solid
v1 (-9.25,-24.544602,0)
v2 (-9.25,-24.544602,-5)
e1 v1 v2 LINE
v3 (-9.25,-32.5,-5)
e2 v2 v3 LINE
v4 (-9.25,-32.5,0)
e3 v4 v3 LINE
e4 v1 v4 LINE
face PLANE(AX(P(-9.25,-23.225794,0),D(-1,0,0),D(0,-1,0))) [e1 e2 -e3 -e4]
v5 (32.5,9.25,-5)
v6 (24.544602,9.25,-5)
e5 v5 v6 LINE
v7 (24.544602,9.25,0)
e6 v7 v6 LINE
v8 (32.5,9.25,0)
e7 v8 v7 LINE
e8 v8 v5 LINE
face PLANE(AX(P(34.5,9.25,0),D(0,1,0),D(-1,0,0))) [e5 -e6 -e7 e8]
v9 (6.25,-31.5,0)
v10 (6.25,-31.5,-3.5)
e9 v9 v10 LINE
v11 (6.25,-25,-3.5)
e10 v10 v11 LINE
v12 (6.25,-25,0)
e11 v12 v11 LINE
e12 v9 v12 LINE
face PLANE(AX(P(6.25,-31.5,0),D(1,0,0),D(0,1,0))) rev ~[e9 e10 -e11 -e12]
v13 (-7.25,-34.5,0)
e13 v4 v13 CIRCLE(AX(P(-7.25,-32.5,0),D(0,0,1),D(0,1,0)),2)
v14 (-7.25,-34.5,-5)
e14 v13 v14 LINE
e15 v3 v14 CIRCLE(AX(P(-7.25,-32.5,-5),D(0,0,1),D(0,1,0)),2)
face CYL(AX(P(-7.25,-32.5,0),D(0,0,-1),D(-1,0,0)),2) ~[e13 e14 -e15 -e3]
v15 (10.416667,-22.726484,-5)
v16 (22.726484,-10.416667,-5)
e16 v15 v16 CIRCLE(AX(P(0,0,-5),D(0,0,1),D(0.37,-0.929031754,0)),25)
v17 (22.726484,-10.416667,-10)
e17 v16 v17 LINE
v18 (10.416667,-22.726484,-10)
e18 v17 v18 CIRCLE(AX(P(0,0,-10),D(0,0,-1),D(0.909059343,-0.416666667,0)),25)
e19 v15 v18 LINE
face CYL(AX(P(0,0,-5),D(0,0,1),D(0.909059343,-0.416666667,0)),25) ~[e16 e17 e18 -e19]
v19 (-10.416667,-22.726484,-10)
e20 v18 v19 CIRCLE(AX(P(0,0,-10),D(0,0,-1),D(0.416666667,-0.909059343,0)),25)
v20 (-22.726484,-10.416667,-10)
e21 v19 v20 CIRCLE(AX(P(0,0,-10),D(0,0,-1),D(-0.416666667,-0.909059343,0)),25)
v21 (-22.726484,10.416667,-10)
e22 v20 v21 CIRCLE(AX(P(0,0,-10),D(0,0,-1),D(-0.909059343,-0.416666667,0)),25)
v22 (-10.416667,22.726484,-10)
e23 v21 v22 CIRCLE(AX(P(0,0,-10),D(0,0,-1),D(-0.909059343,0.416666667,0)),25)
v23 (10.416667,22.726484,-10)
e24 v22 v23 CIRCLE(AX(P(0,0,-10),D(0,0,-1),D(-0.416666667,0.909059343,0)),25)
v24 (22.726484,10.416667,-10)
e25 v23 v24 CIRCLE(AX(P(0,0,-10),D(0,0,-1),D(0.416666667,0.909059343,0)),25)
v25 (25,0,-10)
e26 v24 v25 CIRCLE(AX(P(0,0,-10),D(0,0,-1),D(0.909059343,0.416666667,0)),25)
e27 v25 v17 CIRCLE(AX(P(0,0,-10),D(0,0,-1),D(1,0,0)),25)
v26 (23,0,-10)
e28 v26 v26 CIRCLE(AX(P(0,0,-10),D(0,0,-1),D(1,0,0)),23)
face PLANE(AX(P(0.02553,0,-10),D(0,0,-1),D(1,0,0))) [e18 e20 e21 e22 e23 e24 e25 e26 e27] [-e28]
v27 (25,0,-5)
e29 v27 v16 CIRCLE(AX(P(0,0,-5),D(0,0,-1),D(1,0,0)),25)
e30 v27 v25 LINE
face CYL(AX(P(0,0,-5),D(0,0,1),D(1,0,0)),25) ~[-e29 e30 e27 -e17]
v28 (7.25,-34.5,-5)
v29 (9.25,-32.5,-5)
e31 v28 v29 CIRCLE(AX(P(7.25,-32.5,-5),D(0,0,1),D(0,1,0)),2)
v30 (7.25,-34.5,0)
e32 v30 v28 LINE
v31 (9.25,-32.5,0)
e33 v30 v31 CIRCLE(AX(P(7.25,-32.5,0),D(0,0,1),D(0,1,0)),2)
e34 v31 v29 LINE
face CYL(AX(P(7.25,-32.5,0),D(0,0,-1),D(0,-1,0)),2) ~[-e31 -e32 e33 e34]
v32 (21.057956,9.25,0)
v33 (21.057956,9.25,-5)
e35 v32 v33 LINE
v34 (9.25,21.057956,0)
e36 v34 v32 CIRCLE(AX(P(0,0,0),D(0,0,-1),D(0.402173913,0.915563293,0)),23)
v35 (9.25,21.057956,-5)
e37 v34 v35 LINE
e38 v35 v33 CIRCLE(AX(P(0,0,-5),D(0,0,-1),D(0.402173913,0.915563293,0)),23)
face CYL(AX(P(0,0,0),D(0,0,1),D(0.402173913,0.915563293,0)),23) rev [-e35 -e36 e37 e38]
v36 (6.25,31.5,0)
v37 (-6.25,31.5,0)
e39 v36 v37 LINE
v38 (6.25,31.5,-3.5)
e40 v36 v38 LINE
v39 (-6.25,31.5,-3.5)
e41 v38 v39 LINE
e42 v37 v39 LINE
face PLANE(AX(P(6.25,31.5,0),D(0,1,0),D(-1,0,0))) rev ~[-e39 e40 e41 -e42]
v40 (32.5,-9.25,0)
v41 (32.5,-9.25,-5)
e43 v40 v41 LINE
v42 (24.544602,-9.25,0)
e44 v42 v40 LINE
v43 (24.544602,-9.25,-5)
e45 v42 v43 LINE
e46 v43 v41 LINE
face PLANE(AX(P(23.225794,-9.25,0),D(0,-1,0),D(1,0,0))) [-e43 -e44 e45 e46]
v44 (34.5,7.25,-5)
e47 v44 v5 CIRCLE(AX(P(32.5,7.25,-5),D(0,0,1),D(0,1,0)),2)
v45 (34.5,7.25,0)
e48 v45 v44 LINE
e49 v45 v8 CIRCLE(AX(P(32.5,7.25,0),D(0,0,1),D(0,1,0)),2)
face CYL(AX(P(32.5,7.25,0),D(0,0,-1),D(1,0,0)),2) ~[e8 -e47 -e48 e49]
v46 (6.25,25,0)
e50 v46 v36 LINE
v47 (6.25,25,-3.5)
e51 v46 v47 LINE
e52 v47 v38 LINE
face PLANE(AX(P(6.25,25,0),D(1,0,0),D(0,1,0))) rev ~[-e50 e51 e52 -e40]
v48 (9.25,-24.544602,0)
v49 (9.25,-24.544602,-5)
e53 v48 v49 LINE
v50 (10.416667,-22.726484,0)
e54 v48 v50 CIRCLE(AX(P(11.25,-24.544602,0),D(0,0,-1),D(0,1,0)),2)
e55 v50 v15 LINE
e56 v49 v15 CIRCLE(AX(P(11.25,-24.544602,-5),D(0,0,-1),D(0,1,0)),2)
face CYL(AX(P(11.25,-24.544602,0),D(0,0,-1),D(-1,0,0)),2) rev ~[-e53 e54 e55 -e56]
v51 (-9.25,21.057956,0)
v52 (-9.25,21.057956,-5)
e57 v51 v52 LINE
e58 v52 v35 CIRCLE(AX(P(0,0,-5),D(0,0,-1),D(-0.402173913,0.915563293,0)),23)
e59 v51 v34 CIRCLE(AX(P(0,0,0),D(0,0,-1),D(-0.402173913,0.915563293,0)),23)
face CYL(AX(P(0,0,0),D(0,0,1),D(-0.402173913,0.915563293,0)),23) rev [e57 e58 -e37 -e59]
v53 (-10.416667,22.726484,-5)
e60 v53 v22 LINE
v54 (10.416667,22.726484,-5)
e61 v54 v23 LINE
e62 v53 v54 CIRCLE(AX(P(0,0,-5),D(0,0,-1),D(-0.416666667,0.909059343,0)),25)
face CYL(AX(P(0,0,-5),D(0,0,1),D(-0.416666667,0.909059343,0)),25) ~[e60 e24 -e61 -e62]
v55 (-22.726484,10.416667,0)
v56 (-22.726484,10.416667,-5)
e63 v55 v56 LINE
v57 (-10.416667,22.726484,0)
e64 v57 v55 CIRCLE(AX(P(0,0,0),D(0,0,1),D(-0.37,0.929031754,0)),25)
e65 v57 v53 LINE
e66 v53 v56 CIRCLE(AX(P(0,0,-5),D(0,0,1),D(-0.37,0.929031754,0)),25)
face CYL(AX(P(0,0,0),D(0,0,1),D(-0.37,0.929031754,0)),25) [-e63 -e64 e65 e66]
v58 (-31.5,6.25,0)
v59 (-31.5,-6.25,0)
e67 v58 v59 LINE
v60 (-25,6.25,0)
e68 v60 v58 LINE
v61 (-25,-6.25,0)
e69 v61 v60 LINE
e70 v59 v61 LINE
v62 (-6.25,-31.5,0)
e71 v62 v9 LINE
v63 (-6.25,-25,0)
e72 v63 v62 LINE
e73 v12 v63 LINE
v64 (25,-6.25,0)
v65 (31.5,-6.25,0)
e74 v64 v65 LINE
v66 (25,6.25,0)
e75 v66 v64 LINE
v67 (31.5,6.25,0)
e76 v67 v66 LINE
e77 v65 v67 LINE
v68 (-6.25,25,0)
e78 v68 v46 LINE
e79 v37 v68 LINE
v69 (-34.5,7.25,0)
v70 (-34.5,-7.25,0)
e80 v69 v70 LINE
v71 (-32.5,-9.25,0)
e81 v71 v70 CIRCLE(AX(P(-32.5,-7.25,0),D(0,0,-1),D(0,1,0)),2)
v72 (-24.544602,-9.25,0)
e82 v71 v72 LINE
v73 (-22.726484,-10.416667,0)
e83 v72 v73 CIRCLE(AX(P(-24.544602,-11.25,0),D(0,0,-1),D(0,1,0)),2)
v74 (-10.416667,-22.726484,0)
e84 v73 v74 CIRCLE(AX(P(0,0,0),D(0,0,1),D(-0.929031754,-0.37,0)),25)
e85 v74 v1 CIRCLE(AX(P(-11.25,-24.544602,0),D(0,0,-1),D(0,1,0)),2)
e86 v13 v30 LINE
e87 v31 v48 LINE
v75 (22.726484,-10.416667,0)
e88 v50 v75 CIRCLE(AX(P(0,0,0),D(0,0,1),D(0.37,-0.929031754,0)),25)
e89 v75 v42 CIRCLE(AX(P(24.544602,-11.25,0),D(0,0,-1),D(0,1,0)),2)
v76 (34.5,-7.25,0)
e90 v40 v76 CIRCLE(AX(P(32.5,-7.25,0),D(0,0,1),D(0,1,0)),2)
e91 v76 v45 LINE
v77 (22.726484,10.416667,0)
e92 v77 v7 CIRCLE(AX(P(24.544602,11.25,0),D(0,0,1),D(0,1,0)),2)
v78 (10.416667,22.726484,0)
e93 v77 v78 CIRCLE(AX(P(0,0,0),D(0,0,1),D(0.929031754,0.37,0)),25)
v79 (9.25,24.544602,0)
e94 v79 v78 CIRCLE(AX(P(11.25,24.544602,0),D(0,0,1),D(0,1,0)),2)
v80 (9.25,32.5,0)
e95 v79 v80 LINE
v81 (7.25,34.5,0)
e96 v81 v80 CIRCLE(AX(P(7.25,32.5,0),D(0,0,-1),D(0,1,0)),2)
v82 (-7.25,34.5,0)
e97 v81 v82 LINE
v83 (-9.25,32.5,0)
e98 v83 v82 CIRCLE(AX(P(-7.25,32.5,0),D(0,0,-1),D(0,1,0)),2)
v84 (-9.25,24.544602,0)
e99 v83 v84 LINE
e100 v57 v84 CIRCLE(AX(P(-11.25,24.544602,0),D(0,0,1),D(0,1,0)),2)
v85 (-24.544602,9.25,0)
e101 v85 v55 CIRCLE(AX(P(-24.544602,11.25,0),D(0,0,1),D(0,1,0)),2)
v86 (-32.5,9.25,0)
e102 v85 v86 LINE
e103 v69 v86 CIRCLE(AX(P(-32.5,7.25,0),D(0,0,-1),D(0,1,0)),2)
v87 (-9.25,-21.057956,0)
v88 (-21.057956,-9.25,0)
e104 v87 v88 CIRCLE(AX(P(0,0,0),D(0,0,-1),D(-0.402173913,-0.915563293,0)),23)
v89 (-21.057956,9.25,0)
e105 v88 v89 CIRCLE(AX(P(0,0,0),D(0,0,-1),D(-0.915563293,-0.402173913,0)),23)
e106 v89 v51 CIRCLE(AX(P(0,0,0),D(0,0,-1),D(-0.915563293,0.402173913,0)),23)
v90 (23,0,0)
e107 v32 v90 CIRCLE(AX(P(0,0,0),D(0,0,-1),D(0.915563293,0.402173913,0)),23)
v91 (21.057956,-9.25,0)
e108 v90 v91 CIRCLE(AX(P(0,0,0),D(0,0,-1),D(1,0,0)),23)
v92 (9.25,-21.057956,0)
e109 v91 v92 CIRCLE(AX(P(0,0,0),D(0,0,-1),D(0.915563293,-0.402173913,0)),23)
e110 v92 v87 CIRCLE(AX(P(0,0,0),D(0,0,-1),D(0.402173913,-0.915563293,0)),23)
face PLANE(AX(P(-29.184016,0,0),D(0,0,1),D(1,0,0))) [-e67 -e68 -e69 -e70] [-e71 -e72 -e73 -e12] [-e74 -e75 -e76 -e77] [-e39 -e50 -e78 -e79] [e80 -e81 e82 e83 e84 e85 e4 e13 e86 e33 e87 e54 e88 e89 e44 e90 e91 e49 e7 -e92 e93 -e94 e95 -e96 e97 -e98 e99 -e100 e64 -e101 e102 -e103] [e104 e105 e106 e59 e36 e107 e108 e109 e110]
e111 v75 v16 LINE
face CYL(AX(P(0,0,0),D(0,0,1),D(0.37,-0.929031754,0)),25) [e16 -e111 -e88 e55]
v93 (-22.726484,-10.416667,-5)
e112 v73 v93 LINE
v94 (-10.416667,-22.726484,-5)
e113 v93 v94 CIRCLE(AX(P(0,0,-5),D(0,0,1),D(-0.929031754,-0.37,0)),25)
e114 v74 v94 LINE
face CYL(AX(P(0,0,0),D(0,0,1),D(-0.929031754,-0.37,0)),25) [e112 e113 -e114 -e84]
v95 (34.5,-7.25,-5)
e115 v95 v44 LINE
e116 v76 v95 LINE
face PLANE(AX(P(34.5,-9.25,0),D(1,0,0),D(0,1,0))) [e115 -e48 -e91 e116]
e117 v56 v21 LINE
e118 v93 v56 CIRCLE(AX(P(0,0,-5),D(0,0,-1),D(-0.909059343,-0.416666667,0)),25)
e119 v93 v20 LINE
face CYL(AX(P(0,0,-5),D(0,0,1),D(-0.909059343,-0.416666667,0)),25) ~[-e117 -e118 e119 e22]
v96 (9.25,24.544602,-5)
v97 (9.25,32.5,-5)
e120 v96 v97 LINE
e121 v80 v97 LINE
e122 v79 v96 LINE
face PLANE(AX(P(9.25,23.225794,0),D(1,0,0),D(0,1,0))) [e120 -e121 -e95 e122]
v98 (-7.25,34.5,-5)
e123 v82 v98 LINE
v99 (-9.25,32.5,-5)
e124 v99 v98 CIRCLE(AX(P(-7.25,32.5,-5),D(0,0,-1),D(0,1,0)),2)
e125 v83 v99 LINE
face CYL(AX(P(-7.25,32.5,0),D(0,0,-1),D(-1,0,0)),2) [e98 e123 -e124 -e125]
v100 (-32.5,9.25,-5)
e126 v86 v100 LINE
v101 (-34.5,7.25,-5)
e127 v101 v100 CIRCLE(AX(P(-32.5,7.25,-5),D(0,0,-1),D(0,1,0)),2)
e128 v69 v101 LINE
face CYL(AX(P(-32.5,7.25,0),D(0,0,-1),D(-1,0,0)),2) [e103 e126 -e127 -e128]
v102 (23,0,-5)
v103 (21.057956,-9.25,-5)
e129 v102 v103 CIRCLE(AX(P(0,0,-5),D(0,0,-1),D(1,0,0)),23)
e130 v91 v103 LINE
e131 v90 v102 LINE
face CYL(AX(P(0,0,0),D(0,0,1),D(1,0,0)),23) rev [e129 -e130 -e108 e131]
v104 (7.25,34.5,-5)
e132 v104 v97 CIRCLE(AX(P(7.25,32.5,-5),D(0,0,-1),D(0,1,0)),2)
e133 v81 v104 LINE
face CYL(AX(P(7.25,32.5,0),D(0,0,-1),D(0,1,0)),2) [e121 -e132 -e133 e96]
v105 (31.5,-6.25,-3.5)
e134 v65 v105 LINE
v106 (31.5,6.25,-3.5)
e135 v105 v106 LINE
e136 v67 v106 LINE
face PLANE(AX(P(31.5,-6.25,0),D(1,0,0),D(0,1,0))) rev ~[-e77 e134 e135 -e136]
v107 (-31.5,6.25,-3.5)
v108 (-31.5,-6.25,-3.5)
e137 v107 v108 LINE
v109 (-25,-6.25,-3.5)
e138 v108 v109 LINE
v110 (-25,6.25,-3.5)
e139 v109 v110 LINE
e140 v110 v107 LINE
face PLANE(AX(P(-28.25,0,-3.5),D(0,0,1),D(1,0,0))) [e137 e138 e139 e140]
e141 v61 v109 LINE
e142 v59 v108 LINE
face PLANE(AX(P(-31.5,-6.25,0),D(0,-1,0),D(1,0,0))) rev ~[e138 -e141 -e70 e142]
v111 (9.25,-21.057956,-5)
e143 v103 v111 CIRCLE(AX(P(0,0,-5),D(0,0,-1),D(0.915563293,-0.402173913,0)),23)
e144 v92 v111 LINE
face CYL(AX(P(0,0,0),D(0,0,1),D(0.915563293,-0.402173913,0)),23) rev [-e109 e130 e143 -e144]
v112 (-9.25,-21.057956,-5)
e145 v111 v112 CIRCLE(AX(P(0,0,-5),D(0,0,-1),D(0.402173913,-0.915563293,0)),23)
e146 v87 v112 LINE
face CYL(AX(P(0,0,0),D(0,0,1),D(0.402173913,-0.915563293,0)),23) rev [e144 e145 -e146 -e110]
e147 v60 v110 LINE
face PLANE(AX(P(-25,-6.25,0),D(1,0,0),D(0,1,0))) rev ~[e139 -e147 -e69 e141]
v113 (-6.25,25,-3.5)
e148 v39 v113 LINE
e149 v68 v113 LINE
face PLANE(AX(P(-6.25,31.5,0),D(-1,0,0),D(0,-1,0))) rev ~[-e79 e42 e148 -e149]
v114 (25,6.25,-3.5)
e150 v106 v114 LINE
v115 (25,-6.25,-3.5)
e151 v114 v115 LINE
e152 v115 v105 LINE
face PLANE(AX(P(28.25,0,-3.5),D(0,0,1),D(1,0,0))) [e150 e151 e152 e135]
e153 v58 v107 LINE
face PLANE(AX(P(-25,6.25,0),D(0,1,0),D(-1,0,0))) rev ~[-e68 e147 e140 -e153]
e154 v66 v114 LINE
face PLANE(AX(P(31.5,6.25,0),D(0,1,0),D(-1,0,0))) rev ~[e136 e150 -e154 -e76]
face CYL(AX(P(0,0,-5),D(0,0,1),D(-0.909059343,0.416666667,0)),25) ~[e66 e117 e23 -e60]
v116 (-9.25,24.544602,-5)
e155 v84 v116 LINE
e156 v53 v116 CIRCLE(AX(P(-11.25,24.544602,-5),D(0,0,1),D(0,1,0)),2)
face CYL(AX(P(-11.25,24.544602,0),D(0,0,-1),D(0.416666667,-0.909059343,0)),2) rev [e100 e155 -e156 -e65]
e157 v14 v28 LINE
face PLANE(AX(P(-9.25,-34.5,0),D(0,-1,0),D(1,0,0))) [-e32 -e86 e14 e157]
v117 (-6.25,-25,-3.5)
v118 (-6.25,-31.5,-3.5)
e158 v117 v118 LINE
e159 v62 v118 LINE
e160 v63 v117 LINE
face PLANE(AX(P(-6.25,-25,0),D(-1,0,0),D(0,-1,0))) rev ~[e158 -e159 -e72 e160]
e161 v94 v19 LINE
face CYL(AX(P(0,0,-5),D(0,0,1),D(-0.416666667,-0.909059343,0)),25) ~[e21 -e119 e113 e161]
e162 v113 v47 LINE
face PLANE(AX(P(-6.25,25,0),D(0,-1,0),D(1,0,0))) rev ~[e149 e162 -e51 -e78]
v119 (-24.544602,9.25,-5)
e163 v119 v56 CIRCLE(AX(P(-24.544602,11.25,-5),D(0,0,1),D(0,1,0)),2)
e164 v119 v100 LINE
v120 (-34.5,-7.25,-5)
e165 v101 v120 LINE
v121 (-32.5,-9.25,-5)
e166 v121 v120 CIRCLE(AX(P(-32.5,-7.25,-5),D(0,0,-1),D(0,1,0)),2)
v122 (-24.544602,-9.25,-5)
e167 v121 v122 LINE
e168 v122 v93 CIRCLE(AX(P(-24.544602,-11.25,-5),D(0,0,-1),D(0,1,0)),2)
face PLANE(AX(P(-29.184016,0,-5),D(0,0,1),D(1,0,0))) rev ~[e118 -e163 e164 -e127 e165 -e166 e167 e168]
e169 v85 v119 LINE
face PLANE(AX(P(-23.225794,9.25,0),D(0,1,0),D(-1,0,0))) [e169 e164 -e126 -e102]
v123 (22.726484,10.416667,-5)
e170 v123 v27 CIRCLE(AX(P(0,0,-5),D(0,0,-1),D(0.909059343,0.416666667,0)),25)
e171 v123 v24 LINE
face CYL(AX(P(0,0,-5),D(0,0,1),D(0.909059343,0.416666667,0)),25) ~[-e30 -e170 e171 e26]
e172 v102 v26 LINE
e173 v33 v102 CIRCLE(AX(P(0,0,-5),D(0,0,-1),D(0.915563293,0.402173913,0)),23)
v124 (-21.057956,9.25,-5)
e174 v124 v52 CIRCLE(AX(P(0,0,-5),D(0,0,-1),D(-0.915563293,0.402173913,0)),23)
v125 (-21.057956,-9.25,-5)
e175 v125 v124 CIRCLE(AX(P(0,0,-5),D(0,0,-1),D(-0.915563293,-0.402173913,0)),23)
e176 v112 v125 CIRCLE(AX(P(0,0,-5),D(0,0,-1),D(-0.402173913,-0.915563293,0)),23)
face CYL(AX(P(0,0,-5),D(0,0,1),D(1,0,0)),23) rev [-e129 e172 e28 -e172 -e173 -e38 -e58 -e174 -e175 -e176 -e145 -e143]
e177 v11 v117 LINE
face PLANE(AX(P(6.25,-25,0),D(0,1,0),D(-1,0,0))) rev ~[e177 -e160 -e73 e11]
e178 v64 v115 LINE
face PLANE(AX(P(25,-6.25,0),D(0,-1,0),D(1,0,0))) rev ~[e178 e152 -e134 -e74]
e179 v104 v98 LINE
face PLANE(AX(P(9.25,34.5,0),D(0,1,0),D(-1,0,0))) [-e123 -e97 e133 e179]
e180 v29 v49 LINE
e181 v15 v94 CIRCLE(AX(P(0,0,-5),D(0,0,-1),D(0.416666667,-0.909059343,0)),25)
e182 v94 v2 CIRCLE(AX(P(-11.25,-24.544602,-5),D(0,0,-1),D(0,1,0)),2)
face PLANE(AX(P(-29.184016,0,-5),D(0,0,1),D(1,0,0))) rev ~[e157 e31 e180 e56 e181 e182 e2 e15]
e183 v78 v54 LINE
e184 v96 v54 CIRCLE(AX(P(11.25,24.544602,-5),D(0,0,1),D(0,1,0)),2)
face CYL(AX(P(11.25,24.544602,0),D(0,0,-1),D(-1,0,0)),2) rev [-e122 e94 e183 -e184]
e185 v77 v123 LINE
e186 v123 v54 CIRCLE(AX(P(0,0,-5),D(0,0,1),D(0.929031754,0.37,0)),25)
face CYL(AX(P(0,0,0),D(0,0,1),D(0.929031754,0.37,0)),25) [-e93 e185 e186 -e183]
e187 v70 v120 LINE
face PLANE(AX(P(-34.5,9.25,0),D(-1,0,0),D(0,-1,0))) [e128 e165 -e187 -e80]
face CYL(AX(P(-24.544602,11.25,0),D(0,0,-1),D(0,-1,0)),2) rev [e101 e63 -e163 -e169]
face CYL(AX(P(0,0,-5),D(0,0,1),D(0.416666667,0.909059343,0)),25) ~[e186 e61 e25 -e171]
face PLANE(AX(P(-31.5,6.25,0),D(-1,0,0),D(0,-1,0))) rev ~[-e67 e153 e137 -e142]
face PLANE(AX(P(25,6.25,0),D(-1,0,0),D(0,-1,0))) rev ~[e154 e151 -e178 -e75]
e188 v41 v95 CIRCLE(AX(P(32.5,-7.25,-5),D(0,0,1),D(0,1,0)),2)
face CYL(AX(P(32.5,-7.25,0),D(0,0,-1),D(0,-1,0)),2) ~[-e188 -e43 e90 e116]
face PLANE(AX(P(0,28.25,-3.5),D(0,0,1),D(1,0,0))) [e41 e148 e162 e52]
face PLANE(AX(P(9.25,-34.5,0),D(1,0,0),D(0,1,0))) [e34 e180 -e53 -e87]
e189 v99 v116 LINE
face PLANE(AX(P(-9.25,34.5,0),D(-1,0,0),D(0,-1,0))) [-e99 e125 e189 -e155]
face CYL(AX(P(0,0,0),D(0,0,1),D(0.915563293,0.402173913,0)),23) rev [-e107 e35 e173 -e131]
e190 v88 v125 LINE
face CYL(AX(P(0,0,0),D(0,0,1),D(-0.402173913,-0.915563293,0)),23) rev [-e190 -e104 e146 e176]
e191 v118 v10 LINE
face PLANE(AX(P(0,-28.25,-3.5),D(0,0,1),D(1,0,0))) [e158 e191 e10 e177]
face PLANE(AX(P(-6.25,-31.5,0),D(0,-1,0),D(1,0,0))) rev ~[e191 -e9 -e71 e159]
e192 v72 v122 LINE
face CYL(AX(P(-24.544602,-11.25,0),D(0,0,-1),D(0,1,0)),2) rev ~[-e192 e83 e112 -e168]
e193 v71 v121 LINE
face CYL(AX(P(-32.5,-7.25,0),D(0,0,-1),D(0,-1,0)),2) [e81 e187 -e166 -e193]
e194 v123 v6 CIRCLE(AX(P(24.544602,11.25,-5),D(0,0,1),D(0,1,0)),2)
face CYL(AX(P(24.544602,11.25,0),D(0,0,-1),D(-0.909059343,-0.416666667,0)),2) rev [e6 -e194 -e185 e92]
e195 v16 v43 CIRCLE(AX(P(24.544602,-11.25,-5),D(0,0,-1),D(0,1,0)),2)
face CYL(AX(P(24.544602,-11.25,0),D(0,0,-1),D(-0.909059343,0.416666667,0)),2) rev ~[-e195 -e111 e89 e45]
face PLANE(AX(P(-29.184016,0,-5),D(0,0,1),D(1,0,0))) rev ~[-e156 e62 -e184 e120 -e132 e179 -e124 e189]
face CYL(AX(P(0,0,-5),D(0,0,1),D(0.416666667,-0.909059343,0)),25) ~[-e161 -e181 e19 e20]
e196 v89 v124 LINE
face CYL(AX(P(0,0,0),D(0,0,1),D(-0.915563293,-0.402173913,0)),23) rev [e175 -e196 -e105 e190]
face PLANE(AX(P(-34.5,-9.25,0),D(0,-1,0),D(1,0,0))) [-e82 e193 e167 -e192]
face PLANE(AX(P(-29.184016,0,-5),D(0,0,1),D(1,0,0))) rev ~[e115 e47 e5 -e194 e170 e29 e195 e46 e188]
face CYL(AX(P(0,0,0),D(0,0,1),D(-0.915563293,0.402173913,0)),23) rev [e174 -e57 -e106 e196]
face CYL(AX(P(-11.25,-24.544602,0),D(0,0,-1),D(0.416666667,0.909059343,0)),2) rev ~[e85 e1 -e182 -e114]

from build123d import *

# Parameters (mm, degrees)
F1_DEPTH = 5
F2_DEPTH = 3.5
F3_R     = 2
F4_R     = 23
F5_DEPTH = 5


# Not quite as in the source:
# - a feature names something its author has since deleted; it is built from what else it names


with BuildPart() as f1:
    # F0 (on Top) → F1 (new body)
    with BuildSketch(Plane.XY):
        with BuildLine():
            ThreePointArc((-25, 0), (-24.5524423049, 4.7093074719), (-23.2257938508, 9.25))
            Line((-23.2257938508, 9.25), (-34.5, 9.25))
            Line((-34.5, 9.25), (-34.5, -9.25))
            Line((-34.5, -9.25), (-23.2257938508, -9.25))
            ThreePointArc((-23.2257938508, -9.25), (-24.5524423049, -4.7093074719), (-25, 0))
        make_face()
        Polygon((-25, 6.25), (-25, 0), (-25, -6.25), (-31.5, -6.25), (-31.5, 6.25), align=None, mode=Mode.SUBTRACT)
        with BuildLine():
            Line((34.5, 9.25), (23.2257938508, 9.25))
            ThreePointArc((23.2257938508, 9.25), (24.5524423049, 4.7093074719), (25, 0))
            ThreePointArc((25, 0), (24.5524423049, -4.7093074719), (23.2257938508, -9.25))
            Line((23.2257938508, -9.25), (34.5, -9.25))
            Line((34.5, -9.25), (34.5, 9.25))
        make_face()
        Polygon((25, -6.25), (25, 0), (25, 6.25), (31.5, 6.25), (31.5, -6.25), align=None, mode=Mode.SUBTRACT)
        Polygon((-25, -6.25), (-25, 0), (-25, 6.25), (-31.5, 6.25), (-31.5, -6.25), align=None)
        Polygon((25, 6.25), (25, 0), (25, -6.25), (31.5, -6.25), (31.5, 6.25), align=None)
        with BuildLine():
            ThreePointArc((21.0579557412, 9.25), (22.5092534533, 4.7258342095), (23, 0))
            ThreePointArc((23, 0), (22.5092534533, -4.7258342095), (21.0579557412, -9.25))
            Line((21.0579557412, -9.25), (23.2257938508, -9.25))
            ThreePointArc((23.2257938508, -9.25), (24.5524423049, -4.7093074719), (25, 0))
            ThreePointArc((25, 0), (24.5524423049, 4.7093074719), (23.2257938508, 9.25))
            Line((23.2257938508, 9.25), (21.0579557412, 9.25))
        make_face()
        with BuildLine():
            ThreePointArc((9.25, 21.0579557412), (16.2634559673, 16.2634559673), (21.0579557412, 9.25))
            Line((21.0579557412, 9.25), (23.2257938508, 9.25))
            ThreePointArc((23.2257938508, 9.25), (17.6776695297, 17.6776695297), (9.25, 23.2257938508))
            Line((9.25, 23.2257938508), (9.25, 21.0579557412))
        make_face()
        with BuildLine():
            ThreePointArc((-21.0579557412, 9.25), (-16.2634559673, 16.2634559673), (-9.25, 21.0579557412))
            Line((-9.25, 21.0579557412), (-9.25, 23.2257938508))
            ThreePointArc((-9.25, 23.2257938508), (-17.6776695297, 17.6776695297), (-23.2257938508, 9.25))
            Line((-23.2257938508, 9.25), (-21.0579557412, 9.25))
        make_face()
        with BuildLine():
            Line((-9.25, -23.2257938508), (-9.25, -21.0579557412))
            ThreePointArc((-9.25, -21.0579557412), (-16.2634559673, -16.2634559673), (-21.0579557412, -9.25))
            Line((-21.0579557412, -9.25), (-23.2257938508, -9.25))
            ThreePointArc((-23.2257938508, -9.25), (-17.6776695297, -17.6776695297), (-9.25, -23.2257938508))
        make_face()
        with BuildLine():
            ThreePointArc((-21.0579557412, -9.25), (-23, 0), (-21.0579557412, 9.25))
            Line((-21.0579557412, 9.25), (-23.2257938508, 9.25))
            ThreePointArc((-23.2257938508, 9.25), (-24.5524423049, 4.7093074719), (-25, 0))
            ThreePointArc((-25, 0), (-24.5524423049, -4.7093074719), (-23.2257938508, -9.25))
            Line((-23.2257938508, -9.25), (-21.0579557412, -9.25))
        make_face()
        with BuildLine():
            ThreePointArc((-9.25, 21.0579557412), (0, 23), (9.25, 21.0579557412))
            Line((9.25, 21.0579557412), (9.25, 23.2257938508))
            ThreePointArc((9.25, 23.2257938508), (4.7093074719, 24.5524423049), (0, 25))
            ThreePointArc((0, 25), (-4.7093074719, 24.5524423049), (-9.25, 23.2257938508))
            Line((-9.25, 23.2257938508), (-9.25, 21.0579557412))
        make_face()
        with BuildLine():
            Line((23.2257938508, -9.25), (21.0579557412, -9.25))
            ThreePointArc((21.0579557412, -9.25), (16.2634559673, -16.2634559673), (9.25, -21.0579557412))
            Line((9.25, -21.0579557412), (9.25, -23.2257938508))
            ThreePointArc((9.25, -23.2257938508), (17.6776695297, -17.6776695297), (23.2257938508, -9.25))
        make_face()
        with BuildLine():
            Line((9.25, -23.2257938508), (9.25, -21.0579557412))
            ThreePointArc((9.25, -21.0579557412), (0, -23), (-9.25, -21.0579557412))
            Line((-9.25, -21.0579557412), (-9.25, -23.2257938508))
            ThreePointArc((-9.25, -23.2257938508), (-4.7093074719, -24.5524423049), (0, -25))
            ThreePointArc((0, -25), (4.7093074719, -24.5524423049), (9.25, -23.2257938508))
        make_face()
        with BuildLine():
            Line((9.25, -34.5), (9.25, -23.2257938508))
            ThreePointArc((9.25, -23.2257938508), (4.7093074719, -24.5524423049), (0, -25))
            ThreePointArc((0, -25), (-4.7093074719, -24.5524423049), (-9.25, -23.2257938508))
            Line((-9.25, -23.2257938508), (-9.25, -34.5))
            Line((-9.25, -34.5), (9.25, -34.5))
        make_face()
        Polygon((-6.25, -25), (0, -25), (6.25, -25), (6.25, -31.5), (-6.25, -31.5), align=None, mode=Mode.SUBTRACT)
        Polygon((6.25, -25), (0, -25), (-6.25, -25), (-6.25, -31.5), (6.25, -31.5), align=None)
        with BuildLine():
            ThreePointArc((0, 25), (4.7093074719, 24.5524423049), (9.25, 23.2257938508))
            Line((9.25, 23.2257938508), (9.25, 34.5))
            Line((9.25, 34.5), (-9.25, 34.5))
            Line((-9.25, 34.5), (-9.25, 23.2257938508))
            ThreePointArc((-9.25, 23.2257938508), (-4.7093074719, 24.5524423049), (0, 25))
        make_face()
        Polygon((6.25, 25), (0, 25), (-6.25, 25), (-6.25, 31.5), (6.25, 31.5), align=None, mode=Mode.SUBTRACT)
        Polygon((-6.25, 25), (0, 25), (6.25, 25), (6.25, 31.5), (-6.25, 31.5), align=None)
    extrude(amount=-F1_DEPTH)

    # F0 (on Top) → F2 (cut)
    with BuildSketch(Plane.XY):
        Polygon((-25, -6.25), (-25, 0), (-25, 6.25), (-31.5, 6.25), (-31.5, -6.25), align=None)
        Polygon((25, 6.25), (25, 0), (25, -6.25), (31.5, -6.25), (31.5, 6.25), align=None)
        Polygon((-6.25, 25), (0, 25), (6.25, 25), (6.25, 31.5), (-6.25, 31.5), align=None)
        Polygon((6.25, -25), (0, -25), (-6.25, -25), (-6.25, -31.5), (6.25, -31.5), align=None)
    extrude(amount=-F2_DEPTH, mode=Mode.SUBTRACT)

    # F3
    f3_edges = [f1.edges().sort_by_distance(p)[0] for p in [
        (-34.5, 9.25, -2.5),
        (-34.5, -9.25, -2.5),
        (34.5, 9.25, -2.5),
        (23.225794, -9.25, -2.5),
        (34.5, -9.25, -2.5),
        (-23.225794, -9.25, -2.5),
        (23.225794, 9.25, -2.5),
        (9.25, 34.5, -2.5),
        (9.25, 23.225794, -2.5),
        (9.25, -34.5, -2.5),
        (-9.25, -34.5, -2.5),
        (-9.25, -23.225794, -2.5),
        (9.25, -23.225794, -2.5),
        (-9.25, 34.5, -2.5),
        (-9.25, 23.225794, -2.5),
        (-23.225794, 9.25, -2.5),
    ]]
    fillet(f3_edges, radius=F3_R)

    # F4 (on face) → F5 (join)
    with BuildSketch(Plane(origin=(0, 0, -5), x_dir=(1, 0, 0), z_dir=(0, 0, -1))):
        with BuildLine():
            ThreePointArc((22.7264835722, -10.4166666667), (24.4250085906, -5.330943195), (25, 0))
            ThreePointArc((25, 0), (24.4250085906, 5.330943195), (22.7264835722, 10.4166666667))
            ThreePointArc((22.7264835722, 10.4166666667), (17.6776695297, 17.6776695297), (10.4166666667, 22.7264835722))
            ThreePointArc((10.4166666667, 22.7264835722), (0, 25), (-10.4166666667, 22.7264835722))
            ThreePointArc((-10.4166666667, 22.7264835722), (-17.6776695297, 17.6776695297), (-22.7264835722, 10.4166666667))
            ThreePointArc((-22.7264835722, 10.4166666667), (-25, 0), (-22.7264835722, -10.4166666667))
            ThreePointArc((-22.7264835722, -10.4166666667), (-17.6776695297, -17.6776695297), (-10.4166666667, -22.7264835722))
            ThreePointArc((-10.4166666667, -22.7264835722), (0, -25), (10.4166666667, -22.7264835722))
            ThreePointArc((10.4166666667, -22.7264835722), (17.6776695297, -17.6776695297), (22.7264835722, -10.4166666667))
        make_face()
        Circle(F4_R, mode=Mode.SUBTRACT)
    extrude(amount=F5_DEPTH)


solid = f1.part
